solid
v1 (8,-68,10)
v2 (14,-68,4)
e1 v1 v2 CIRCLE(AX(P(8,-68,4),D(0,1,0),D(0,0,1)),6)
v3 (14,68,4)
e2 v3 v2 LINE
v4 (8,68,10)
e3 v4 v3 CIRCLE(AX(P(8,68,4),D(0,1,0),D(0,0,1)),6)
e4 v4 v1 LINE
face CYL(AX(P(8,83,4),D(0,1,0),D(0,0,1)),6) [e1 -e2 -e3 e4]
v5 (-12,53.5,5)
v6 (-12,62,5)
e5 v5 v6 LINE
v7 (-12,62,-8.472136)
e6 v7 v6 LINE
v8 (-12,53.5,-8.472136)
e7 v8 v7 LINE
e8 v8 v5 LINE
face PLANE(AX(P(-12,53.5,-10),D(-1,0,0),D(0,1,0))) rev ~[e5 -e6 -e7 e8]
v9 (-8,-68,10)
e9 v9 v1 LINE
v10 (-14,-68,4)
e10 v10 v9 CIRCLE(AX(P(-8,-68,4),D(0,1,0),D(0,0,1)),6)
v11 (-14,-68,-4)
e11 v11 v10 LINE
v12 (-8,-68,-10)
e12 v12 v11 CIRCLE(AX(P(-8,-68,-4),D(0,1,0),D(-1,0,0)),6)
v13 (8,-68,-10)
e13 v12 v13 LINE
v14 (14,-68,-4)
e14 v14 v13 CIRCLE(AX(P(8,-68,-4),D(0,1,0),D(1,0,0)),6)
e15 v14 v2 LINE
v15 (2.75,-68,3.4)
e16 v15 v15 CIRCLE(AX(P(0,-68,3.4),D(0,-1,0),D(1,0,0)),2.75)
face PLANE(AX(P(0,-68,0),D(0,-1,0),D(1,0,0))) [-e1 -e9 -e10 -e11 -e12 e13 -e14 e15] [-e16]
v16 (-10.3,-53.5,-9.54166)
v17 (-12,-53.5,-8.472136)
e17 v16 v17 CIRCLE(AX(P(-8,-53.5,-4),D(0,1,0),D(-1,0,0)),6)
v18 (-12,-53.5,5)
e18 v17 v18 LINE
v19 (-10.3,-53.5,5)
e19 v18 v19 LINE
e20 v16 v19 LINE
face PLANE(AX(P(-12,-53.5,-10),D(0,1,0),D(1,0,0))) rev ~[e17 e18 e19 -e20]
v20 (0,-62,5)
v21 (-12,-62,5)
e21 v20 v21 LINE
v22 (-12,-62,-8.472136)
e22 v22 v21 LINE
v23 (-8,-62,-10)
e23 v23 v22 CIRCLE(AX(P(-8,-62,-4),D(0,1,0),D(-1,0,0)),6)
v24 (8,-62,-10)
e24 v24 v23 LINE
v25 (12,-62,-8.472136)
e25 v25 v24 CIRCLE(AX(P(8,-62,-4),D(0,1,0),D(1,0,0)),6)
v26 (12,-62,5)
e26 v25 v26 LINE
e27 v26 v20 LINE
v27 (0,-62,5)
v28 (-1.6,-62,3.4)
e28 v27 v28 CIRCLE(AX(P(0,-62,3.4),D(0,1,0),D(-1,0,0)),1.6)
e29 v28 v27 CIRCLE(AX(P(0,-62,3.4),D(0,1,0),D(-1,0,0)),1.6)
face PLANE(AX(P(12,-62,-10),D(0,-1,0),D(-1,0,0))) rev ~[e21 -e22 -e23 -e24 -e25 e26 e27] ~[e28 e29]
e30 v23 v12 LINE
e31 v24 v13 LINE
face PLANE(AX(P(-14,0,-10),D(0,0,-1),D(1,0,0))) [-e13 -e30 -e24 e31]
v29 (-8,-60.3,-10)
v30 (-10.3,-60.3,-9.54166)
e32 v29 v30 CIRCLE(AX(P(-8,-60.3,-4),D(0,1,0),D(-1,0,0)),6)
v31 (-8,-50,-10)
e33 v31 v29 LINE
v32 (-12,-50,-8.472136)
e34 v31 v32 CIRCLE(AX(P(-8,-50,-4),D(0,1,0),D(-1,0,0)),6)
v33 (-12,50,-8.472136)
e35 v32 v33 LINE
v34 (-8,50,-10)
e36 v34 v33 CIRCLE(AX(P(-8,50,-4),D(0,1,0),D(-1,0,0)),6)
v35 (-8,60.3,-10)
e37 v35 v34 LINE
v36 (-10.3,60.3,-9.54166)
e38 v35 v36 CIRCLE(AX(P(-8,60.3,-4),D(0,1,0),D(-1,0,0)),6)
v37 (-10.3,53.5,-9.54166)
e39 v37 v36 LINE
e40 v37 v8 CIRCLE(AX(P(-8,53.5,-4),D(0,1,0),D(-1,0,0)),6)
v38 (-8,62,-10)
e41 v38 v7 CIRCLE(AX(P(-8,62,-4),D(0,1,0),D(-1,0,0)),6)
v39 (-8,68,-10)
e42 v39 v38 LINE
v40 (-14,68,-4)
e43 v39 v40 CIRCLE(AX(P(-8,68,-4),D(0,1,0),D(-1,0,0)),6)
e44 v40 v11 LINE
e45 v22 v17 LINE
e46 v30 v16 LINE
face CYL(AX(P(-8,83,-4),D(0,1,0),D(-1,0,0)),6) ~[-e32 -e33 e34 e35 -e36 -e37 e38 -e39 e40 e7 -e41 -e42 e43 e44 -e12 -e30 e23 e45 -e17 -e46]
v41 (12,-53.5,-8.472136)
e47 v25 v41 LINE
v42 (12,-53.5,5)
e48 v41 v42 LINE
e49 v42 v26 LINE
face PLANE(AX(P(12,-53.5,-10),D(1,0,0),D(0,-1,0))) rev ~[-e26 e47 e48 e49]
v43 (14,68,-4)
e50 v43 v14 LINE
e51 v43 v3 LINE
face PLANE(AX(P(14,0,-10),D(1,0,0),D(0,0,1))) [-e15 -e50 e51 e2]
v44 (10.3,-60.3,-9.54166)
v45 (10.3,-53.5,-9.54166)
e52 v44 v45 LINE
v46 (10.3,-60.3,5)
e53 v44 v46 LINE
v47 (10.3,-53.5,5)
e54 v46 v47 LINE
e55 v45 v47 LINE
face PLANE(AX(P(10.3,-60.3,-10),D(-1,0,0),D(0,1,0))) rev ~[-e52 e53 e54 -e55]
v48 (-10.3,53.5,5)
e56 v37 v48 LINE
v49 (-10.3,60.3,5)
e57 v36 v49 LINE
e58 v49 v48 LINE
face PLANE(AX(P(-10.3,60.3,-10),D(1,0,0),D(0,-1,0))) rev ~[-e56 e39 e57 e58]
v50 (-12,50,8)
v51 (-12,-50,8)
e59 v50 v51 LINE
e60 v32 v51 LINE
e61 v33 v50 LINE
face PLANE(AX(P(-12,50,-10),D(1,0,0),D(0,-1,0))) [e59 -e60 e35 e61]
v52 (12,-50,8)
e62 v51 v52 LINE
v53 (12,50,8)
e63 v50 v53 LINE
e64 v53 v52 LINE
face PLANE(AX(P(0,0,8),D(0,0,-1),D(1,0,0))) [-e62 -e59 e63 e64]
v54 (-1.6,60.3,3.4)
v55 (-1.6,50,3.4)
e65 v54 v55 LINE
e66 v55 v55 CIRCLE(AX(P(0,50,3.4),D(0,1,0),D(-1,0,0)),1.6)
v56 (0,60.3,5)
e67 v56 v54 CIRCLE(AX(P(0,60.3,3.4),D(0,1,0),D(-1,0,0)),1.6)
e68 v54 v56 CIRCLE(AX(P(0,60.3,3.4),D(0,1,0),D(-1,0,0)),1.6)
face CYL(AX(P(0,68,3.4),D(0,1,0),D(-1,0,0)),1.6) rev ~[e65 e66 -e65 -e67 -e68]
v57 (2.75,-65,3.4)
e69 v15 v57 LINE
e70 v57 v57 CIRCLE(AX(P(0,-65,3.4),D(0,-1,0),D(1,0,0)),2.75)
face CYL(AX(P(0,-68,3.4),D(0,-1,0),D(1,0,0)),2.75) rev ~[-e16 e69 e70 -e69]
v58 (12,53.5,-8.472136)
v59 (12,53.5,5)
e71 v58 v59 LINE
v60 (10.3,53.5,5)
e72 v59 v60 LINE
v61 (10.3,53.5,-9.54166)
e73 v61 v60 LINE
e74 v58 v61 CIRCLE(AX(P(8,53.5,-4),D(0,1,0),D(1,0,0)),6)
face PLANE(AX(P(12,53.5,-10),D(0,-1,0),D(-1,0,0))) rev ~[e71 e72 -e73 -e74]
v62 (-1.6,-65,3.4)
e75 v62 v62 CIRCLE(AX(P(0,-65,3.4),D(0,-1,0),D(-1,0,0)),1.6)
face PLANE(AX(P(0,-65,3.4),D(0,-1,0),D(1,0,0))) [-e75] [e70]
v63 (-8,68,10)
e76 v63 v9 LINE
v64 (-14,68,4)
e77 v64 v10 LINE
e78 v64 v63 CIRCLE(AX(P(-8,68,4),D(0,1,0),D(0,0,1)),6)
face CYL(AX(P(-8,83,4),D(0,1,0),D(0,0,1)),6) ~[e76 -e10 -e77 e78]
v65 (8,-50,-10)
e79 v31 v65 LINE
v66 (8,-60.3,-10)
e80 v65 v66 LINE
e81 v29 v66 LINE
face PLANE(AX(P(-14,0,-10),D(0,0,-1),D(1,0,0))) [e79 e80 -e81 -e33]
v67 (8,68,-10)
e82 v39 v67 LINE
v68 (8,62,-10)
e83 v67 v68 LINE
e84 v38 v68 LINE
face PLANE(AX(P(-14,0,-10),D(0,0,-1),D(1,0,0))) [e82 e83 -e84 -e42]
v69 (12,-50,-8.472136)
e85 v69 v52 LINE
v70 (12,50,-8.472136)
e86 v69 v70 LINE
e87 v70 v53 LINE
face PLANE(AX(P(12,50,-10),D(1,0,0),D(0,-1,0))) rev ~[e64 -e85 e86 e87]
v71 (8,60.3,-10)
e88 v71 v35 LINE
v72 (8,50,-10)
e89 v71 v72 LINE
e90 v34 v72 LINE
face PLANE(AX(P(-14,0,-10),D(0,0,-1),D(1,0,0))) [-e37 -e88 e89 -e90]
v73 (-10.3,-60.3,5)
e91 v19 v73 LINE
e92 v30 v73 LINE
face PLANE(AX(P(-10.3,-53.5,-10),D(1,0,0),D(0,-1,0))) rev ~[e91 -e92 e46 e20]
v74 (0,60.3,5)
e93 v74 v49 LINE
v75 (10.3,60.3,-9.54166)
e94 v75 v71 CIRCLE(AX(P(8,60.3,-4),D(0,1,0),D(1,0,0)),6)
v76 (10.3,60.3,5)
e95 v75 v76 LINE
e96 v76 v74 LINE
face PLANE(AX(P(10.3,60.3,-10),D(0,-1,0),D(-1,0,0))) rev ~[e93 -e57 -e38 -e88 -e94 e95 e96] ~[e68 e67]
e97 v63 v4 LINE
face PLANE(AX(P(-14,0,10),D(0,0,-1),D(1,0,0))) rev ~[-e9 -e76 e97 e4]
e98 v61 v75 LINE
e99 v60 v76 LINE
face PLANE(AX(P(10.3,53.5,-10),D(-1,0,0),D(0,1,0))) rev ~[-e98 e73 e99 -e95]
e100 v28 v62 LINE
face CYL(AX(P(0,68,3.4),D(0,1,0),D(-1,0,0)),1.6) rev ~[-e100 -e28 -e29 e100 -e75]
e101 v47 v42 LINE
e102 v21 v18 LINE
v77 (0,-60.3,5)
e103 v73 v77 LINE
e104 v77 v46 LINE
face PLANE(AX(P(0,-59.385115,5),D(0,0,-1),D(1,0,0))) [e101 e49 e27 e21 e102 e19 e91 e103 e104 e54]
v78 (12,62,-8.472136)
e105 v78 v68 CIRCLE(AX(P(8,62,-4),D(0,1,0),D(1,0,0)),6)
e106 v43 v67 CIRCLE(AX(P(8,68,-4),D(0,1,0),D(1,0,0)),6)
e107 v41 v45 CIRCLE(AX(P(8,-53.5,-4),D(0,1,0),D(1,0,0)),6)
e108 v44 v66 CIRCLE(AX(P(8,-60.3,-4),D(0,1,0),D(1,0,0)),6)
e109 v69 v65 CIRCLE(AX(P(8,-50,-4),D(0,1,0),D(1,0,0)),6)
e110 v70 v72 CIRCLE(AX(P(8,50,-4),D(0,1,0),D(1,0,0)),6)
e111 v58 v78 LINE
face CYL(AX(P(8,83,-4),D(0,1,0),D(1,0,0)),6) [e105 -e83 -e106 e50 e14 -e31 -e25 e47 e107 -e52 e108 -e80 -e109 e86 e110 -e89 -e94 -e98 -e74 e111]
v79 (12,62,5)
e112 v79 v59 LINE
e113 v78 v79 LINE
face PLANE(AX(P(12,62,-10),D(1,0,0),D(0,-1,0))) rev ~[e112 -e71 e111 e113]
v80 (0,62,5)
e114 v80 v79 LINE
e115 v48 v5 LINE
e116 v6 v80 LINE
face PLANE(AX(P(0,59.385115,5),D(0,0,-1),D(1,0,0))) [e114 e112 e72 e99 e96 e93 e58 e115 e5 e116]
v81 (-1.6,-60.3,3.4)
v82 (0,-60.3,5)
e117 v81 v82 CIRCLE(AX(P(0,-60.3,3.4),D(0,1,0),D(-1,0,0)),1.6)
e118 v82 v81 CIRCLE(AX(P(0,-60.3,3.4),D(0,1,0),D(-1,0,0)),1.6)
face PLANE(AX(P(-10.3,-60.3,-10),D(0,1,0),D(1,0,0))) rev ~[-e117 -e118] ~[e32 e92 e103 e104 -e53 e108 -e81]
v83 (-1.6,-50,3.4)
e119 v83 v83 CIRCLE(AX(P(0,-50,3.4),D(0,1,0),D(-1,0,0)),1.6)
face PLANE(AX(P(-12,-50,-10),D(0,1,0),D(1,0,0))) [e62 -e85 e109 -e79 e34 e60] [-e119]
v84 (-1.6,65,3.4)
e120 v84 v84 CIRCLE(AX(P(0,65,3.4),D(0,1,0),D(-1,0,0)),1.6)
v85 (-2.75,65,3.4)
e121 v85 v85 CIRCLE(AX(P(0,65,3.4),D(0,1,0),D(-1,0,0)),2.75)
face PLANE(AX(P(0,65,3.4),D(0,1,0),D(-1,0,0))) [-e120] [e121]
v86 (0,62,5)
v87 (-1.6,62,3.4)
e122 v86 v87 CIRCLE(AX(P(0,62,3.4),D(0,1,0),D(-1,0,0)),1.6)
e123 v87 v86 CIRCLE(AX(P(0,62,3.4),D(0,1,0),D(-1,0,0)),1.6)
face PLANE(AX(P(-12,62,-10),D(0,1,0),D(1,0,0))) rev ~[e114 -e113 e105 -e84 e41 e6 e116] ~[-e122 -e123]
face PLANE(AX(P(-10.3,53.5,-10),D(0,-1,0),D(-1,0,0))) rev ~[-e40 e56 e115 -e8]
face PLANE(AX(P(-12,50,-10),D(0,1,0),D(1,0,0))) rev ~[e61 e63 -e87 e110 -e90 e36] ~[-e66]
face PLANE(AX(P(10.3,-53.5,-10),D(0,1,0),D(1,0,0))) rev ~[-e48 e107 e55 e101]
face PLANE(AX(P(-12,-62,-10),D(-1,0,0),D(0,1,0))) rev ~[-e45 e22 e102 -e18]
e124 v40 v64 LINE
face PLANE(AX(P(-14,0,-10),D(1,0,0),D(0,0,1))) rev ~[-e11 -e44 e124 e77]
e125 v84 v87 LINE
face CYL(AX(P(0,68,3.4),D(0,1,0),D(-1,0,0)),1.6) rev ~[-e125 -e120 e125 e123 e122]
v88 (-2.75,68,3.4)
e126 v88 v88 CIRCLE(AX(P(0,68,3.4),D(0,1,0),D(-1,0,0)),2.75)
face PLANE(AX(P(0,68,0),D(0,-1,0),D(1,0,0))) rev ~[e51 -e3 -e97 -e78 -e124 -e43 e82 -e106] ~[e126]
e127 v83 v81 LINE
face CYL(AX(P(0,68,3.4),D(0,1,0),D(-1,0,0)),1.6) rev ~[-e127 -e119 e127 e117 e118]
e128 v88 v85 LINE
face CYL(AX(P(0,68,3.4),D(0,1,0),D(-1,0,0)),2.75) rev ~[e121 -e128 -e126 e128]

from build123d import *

# Parameters (mm, degrees)
F0_W        = 28
F0_H        = 20
F1_DEPTH    = 68
F3_DEPTH    = 15
F2_W        = 24
F2_H        = 100
F4_DEPTH    = 18
F5_T1_DEPTH = 166
F6_R        = 1.6
F7_DEPTH    = 140
F6_R_2      = 2.75
F8_DEPTH    = 3
F9_R        = 2.75
F9_R_2      = 1.6
F10_DEPTH   = 3


# Not quite as in the source:
# - a fillet or chamfer that OpenCascade refuses, or shapes differently, is made with other operations: its cross-section is extruded or revolved along the edge and cut away or added


with BuildPart() as f1:
    # F0 (on Front) → F1 (new body, symmetric)
    with BuildSketch(Plane.XZ):
        Rectangle(F0_W, F0_H)
    extrude(amount=F1_DEPTH, both=True)

    # F2 (on face) → F3 (cut)
    with BuildSketch(Plane(origin=(0, 0, -10), x_dir=(1, 0, 0), z_dir=(0, 0, -1))):
        Polygon((12, 62), (-12, 62), (-12, 53.5), (-10.3, 53.5), (-10.3, 60.3), (10.3, 60.3), (10.3, 53.5), (12, 53.5), align=None)
        Polygon((-12, -53.5), (-12, -62), (12, -62), (12, -53.5), (10.3, -53.5), (10.3, -60.3), (-10.3, -60.3), (-10.3, -53.5), align=None)
    extrude(amount=-F3_DEPTH, mode=Mode.SUBTRACT)

    # F2 (on face) → F4 (cut)
    with BuildSketch(Plane(origin=(0, 0, -10), x_dir=(1, 0, 0), z_dir=(0, 0, -1))):
        Rectangle(F2_W, F2_H)
    extrude(amount=-F4_DEPTH, mode=Mode.SUBTRACT)

    # F5: fillet of radius 6 on 4 edges, made by hand

    # F5_s2 → F5_t1 (cut)
    with BuildSketch(Plane.XZ.offset(-83)):
        with BuildLine():
            ThreePointArc((-8, 10), (-12.2426406871, 8.2426406871), (-14, 4))
            Line((-14, 4), (-14, 10))
            Line((-14, 10), (-8, 10))
        make_face()
        with BuildLine():
            ThreePointArc((8, 10), (12.2426406871, 8.2426406871), (14, 4))
            Line((14, 4), (14, 10))
            Line((14, 10), (8, 10))
        make_face()
        with BuildLine():
            ThreePointArc((14, -4), (12.2426406871, -8.2426406871), (8, -10))
            Line((8, -10), (14, -10))
            Line((14, -10), (14, -4))
        make_face()
        with BuildLine():
            ThreePointArc((-14, -4), (-12.2426406871, -8.2426406871), (-8, -10))
            Line((-8, -10), (-14, -10))
            Line((-14, -10), (-14, -4))
        make_face()
    extrude(amount=F5_T1_DEPTH, mode=Mode.SUBTRACT)

    # F6 (on face) → F7 (cut)
    with BuildSketch(Plane(origin=(0, 68, 0), x_dir=(-1, 0, 0), z_dir=(0, 1, 0))):
        with Locations((0, 3.4)):
            Circle(F6_R)
    extrude(amount=-F7_DEPTH, mode=Mode.SUBTRACT)

    # F6 (on face) → F8 (cut)
    with BuildSketch(Plane(origin=(0, 68, 0), x_dir=(-1, 0, 0), z_dir=(0, 1, 0))):
        with Locations((0, 3.4)):
            Circle(F6_R_2)
        with Locations((0, 3.4)):
            Circle(F6_R, mode=Mode.SUBTRACT)
    extrude(amount=-F8_DEPTH, mode=Mode.SUBTRACT)

    # F9 (on face) → F10 (cut)
    with BuildSketch(Plane.XZ.offset(68)):
        with Locations((0, 3.4)):
            Circle(F9_R)
        with Locations((0, 3.4)):
            Circle(F9_R_2, mode=Mode.SUBTRACT)
    extrude(amount=-F10_DEPTH, mode=Mode.SUBTRACT)


solid = f1.part
